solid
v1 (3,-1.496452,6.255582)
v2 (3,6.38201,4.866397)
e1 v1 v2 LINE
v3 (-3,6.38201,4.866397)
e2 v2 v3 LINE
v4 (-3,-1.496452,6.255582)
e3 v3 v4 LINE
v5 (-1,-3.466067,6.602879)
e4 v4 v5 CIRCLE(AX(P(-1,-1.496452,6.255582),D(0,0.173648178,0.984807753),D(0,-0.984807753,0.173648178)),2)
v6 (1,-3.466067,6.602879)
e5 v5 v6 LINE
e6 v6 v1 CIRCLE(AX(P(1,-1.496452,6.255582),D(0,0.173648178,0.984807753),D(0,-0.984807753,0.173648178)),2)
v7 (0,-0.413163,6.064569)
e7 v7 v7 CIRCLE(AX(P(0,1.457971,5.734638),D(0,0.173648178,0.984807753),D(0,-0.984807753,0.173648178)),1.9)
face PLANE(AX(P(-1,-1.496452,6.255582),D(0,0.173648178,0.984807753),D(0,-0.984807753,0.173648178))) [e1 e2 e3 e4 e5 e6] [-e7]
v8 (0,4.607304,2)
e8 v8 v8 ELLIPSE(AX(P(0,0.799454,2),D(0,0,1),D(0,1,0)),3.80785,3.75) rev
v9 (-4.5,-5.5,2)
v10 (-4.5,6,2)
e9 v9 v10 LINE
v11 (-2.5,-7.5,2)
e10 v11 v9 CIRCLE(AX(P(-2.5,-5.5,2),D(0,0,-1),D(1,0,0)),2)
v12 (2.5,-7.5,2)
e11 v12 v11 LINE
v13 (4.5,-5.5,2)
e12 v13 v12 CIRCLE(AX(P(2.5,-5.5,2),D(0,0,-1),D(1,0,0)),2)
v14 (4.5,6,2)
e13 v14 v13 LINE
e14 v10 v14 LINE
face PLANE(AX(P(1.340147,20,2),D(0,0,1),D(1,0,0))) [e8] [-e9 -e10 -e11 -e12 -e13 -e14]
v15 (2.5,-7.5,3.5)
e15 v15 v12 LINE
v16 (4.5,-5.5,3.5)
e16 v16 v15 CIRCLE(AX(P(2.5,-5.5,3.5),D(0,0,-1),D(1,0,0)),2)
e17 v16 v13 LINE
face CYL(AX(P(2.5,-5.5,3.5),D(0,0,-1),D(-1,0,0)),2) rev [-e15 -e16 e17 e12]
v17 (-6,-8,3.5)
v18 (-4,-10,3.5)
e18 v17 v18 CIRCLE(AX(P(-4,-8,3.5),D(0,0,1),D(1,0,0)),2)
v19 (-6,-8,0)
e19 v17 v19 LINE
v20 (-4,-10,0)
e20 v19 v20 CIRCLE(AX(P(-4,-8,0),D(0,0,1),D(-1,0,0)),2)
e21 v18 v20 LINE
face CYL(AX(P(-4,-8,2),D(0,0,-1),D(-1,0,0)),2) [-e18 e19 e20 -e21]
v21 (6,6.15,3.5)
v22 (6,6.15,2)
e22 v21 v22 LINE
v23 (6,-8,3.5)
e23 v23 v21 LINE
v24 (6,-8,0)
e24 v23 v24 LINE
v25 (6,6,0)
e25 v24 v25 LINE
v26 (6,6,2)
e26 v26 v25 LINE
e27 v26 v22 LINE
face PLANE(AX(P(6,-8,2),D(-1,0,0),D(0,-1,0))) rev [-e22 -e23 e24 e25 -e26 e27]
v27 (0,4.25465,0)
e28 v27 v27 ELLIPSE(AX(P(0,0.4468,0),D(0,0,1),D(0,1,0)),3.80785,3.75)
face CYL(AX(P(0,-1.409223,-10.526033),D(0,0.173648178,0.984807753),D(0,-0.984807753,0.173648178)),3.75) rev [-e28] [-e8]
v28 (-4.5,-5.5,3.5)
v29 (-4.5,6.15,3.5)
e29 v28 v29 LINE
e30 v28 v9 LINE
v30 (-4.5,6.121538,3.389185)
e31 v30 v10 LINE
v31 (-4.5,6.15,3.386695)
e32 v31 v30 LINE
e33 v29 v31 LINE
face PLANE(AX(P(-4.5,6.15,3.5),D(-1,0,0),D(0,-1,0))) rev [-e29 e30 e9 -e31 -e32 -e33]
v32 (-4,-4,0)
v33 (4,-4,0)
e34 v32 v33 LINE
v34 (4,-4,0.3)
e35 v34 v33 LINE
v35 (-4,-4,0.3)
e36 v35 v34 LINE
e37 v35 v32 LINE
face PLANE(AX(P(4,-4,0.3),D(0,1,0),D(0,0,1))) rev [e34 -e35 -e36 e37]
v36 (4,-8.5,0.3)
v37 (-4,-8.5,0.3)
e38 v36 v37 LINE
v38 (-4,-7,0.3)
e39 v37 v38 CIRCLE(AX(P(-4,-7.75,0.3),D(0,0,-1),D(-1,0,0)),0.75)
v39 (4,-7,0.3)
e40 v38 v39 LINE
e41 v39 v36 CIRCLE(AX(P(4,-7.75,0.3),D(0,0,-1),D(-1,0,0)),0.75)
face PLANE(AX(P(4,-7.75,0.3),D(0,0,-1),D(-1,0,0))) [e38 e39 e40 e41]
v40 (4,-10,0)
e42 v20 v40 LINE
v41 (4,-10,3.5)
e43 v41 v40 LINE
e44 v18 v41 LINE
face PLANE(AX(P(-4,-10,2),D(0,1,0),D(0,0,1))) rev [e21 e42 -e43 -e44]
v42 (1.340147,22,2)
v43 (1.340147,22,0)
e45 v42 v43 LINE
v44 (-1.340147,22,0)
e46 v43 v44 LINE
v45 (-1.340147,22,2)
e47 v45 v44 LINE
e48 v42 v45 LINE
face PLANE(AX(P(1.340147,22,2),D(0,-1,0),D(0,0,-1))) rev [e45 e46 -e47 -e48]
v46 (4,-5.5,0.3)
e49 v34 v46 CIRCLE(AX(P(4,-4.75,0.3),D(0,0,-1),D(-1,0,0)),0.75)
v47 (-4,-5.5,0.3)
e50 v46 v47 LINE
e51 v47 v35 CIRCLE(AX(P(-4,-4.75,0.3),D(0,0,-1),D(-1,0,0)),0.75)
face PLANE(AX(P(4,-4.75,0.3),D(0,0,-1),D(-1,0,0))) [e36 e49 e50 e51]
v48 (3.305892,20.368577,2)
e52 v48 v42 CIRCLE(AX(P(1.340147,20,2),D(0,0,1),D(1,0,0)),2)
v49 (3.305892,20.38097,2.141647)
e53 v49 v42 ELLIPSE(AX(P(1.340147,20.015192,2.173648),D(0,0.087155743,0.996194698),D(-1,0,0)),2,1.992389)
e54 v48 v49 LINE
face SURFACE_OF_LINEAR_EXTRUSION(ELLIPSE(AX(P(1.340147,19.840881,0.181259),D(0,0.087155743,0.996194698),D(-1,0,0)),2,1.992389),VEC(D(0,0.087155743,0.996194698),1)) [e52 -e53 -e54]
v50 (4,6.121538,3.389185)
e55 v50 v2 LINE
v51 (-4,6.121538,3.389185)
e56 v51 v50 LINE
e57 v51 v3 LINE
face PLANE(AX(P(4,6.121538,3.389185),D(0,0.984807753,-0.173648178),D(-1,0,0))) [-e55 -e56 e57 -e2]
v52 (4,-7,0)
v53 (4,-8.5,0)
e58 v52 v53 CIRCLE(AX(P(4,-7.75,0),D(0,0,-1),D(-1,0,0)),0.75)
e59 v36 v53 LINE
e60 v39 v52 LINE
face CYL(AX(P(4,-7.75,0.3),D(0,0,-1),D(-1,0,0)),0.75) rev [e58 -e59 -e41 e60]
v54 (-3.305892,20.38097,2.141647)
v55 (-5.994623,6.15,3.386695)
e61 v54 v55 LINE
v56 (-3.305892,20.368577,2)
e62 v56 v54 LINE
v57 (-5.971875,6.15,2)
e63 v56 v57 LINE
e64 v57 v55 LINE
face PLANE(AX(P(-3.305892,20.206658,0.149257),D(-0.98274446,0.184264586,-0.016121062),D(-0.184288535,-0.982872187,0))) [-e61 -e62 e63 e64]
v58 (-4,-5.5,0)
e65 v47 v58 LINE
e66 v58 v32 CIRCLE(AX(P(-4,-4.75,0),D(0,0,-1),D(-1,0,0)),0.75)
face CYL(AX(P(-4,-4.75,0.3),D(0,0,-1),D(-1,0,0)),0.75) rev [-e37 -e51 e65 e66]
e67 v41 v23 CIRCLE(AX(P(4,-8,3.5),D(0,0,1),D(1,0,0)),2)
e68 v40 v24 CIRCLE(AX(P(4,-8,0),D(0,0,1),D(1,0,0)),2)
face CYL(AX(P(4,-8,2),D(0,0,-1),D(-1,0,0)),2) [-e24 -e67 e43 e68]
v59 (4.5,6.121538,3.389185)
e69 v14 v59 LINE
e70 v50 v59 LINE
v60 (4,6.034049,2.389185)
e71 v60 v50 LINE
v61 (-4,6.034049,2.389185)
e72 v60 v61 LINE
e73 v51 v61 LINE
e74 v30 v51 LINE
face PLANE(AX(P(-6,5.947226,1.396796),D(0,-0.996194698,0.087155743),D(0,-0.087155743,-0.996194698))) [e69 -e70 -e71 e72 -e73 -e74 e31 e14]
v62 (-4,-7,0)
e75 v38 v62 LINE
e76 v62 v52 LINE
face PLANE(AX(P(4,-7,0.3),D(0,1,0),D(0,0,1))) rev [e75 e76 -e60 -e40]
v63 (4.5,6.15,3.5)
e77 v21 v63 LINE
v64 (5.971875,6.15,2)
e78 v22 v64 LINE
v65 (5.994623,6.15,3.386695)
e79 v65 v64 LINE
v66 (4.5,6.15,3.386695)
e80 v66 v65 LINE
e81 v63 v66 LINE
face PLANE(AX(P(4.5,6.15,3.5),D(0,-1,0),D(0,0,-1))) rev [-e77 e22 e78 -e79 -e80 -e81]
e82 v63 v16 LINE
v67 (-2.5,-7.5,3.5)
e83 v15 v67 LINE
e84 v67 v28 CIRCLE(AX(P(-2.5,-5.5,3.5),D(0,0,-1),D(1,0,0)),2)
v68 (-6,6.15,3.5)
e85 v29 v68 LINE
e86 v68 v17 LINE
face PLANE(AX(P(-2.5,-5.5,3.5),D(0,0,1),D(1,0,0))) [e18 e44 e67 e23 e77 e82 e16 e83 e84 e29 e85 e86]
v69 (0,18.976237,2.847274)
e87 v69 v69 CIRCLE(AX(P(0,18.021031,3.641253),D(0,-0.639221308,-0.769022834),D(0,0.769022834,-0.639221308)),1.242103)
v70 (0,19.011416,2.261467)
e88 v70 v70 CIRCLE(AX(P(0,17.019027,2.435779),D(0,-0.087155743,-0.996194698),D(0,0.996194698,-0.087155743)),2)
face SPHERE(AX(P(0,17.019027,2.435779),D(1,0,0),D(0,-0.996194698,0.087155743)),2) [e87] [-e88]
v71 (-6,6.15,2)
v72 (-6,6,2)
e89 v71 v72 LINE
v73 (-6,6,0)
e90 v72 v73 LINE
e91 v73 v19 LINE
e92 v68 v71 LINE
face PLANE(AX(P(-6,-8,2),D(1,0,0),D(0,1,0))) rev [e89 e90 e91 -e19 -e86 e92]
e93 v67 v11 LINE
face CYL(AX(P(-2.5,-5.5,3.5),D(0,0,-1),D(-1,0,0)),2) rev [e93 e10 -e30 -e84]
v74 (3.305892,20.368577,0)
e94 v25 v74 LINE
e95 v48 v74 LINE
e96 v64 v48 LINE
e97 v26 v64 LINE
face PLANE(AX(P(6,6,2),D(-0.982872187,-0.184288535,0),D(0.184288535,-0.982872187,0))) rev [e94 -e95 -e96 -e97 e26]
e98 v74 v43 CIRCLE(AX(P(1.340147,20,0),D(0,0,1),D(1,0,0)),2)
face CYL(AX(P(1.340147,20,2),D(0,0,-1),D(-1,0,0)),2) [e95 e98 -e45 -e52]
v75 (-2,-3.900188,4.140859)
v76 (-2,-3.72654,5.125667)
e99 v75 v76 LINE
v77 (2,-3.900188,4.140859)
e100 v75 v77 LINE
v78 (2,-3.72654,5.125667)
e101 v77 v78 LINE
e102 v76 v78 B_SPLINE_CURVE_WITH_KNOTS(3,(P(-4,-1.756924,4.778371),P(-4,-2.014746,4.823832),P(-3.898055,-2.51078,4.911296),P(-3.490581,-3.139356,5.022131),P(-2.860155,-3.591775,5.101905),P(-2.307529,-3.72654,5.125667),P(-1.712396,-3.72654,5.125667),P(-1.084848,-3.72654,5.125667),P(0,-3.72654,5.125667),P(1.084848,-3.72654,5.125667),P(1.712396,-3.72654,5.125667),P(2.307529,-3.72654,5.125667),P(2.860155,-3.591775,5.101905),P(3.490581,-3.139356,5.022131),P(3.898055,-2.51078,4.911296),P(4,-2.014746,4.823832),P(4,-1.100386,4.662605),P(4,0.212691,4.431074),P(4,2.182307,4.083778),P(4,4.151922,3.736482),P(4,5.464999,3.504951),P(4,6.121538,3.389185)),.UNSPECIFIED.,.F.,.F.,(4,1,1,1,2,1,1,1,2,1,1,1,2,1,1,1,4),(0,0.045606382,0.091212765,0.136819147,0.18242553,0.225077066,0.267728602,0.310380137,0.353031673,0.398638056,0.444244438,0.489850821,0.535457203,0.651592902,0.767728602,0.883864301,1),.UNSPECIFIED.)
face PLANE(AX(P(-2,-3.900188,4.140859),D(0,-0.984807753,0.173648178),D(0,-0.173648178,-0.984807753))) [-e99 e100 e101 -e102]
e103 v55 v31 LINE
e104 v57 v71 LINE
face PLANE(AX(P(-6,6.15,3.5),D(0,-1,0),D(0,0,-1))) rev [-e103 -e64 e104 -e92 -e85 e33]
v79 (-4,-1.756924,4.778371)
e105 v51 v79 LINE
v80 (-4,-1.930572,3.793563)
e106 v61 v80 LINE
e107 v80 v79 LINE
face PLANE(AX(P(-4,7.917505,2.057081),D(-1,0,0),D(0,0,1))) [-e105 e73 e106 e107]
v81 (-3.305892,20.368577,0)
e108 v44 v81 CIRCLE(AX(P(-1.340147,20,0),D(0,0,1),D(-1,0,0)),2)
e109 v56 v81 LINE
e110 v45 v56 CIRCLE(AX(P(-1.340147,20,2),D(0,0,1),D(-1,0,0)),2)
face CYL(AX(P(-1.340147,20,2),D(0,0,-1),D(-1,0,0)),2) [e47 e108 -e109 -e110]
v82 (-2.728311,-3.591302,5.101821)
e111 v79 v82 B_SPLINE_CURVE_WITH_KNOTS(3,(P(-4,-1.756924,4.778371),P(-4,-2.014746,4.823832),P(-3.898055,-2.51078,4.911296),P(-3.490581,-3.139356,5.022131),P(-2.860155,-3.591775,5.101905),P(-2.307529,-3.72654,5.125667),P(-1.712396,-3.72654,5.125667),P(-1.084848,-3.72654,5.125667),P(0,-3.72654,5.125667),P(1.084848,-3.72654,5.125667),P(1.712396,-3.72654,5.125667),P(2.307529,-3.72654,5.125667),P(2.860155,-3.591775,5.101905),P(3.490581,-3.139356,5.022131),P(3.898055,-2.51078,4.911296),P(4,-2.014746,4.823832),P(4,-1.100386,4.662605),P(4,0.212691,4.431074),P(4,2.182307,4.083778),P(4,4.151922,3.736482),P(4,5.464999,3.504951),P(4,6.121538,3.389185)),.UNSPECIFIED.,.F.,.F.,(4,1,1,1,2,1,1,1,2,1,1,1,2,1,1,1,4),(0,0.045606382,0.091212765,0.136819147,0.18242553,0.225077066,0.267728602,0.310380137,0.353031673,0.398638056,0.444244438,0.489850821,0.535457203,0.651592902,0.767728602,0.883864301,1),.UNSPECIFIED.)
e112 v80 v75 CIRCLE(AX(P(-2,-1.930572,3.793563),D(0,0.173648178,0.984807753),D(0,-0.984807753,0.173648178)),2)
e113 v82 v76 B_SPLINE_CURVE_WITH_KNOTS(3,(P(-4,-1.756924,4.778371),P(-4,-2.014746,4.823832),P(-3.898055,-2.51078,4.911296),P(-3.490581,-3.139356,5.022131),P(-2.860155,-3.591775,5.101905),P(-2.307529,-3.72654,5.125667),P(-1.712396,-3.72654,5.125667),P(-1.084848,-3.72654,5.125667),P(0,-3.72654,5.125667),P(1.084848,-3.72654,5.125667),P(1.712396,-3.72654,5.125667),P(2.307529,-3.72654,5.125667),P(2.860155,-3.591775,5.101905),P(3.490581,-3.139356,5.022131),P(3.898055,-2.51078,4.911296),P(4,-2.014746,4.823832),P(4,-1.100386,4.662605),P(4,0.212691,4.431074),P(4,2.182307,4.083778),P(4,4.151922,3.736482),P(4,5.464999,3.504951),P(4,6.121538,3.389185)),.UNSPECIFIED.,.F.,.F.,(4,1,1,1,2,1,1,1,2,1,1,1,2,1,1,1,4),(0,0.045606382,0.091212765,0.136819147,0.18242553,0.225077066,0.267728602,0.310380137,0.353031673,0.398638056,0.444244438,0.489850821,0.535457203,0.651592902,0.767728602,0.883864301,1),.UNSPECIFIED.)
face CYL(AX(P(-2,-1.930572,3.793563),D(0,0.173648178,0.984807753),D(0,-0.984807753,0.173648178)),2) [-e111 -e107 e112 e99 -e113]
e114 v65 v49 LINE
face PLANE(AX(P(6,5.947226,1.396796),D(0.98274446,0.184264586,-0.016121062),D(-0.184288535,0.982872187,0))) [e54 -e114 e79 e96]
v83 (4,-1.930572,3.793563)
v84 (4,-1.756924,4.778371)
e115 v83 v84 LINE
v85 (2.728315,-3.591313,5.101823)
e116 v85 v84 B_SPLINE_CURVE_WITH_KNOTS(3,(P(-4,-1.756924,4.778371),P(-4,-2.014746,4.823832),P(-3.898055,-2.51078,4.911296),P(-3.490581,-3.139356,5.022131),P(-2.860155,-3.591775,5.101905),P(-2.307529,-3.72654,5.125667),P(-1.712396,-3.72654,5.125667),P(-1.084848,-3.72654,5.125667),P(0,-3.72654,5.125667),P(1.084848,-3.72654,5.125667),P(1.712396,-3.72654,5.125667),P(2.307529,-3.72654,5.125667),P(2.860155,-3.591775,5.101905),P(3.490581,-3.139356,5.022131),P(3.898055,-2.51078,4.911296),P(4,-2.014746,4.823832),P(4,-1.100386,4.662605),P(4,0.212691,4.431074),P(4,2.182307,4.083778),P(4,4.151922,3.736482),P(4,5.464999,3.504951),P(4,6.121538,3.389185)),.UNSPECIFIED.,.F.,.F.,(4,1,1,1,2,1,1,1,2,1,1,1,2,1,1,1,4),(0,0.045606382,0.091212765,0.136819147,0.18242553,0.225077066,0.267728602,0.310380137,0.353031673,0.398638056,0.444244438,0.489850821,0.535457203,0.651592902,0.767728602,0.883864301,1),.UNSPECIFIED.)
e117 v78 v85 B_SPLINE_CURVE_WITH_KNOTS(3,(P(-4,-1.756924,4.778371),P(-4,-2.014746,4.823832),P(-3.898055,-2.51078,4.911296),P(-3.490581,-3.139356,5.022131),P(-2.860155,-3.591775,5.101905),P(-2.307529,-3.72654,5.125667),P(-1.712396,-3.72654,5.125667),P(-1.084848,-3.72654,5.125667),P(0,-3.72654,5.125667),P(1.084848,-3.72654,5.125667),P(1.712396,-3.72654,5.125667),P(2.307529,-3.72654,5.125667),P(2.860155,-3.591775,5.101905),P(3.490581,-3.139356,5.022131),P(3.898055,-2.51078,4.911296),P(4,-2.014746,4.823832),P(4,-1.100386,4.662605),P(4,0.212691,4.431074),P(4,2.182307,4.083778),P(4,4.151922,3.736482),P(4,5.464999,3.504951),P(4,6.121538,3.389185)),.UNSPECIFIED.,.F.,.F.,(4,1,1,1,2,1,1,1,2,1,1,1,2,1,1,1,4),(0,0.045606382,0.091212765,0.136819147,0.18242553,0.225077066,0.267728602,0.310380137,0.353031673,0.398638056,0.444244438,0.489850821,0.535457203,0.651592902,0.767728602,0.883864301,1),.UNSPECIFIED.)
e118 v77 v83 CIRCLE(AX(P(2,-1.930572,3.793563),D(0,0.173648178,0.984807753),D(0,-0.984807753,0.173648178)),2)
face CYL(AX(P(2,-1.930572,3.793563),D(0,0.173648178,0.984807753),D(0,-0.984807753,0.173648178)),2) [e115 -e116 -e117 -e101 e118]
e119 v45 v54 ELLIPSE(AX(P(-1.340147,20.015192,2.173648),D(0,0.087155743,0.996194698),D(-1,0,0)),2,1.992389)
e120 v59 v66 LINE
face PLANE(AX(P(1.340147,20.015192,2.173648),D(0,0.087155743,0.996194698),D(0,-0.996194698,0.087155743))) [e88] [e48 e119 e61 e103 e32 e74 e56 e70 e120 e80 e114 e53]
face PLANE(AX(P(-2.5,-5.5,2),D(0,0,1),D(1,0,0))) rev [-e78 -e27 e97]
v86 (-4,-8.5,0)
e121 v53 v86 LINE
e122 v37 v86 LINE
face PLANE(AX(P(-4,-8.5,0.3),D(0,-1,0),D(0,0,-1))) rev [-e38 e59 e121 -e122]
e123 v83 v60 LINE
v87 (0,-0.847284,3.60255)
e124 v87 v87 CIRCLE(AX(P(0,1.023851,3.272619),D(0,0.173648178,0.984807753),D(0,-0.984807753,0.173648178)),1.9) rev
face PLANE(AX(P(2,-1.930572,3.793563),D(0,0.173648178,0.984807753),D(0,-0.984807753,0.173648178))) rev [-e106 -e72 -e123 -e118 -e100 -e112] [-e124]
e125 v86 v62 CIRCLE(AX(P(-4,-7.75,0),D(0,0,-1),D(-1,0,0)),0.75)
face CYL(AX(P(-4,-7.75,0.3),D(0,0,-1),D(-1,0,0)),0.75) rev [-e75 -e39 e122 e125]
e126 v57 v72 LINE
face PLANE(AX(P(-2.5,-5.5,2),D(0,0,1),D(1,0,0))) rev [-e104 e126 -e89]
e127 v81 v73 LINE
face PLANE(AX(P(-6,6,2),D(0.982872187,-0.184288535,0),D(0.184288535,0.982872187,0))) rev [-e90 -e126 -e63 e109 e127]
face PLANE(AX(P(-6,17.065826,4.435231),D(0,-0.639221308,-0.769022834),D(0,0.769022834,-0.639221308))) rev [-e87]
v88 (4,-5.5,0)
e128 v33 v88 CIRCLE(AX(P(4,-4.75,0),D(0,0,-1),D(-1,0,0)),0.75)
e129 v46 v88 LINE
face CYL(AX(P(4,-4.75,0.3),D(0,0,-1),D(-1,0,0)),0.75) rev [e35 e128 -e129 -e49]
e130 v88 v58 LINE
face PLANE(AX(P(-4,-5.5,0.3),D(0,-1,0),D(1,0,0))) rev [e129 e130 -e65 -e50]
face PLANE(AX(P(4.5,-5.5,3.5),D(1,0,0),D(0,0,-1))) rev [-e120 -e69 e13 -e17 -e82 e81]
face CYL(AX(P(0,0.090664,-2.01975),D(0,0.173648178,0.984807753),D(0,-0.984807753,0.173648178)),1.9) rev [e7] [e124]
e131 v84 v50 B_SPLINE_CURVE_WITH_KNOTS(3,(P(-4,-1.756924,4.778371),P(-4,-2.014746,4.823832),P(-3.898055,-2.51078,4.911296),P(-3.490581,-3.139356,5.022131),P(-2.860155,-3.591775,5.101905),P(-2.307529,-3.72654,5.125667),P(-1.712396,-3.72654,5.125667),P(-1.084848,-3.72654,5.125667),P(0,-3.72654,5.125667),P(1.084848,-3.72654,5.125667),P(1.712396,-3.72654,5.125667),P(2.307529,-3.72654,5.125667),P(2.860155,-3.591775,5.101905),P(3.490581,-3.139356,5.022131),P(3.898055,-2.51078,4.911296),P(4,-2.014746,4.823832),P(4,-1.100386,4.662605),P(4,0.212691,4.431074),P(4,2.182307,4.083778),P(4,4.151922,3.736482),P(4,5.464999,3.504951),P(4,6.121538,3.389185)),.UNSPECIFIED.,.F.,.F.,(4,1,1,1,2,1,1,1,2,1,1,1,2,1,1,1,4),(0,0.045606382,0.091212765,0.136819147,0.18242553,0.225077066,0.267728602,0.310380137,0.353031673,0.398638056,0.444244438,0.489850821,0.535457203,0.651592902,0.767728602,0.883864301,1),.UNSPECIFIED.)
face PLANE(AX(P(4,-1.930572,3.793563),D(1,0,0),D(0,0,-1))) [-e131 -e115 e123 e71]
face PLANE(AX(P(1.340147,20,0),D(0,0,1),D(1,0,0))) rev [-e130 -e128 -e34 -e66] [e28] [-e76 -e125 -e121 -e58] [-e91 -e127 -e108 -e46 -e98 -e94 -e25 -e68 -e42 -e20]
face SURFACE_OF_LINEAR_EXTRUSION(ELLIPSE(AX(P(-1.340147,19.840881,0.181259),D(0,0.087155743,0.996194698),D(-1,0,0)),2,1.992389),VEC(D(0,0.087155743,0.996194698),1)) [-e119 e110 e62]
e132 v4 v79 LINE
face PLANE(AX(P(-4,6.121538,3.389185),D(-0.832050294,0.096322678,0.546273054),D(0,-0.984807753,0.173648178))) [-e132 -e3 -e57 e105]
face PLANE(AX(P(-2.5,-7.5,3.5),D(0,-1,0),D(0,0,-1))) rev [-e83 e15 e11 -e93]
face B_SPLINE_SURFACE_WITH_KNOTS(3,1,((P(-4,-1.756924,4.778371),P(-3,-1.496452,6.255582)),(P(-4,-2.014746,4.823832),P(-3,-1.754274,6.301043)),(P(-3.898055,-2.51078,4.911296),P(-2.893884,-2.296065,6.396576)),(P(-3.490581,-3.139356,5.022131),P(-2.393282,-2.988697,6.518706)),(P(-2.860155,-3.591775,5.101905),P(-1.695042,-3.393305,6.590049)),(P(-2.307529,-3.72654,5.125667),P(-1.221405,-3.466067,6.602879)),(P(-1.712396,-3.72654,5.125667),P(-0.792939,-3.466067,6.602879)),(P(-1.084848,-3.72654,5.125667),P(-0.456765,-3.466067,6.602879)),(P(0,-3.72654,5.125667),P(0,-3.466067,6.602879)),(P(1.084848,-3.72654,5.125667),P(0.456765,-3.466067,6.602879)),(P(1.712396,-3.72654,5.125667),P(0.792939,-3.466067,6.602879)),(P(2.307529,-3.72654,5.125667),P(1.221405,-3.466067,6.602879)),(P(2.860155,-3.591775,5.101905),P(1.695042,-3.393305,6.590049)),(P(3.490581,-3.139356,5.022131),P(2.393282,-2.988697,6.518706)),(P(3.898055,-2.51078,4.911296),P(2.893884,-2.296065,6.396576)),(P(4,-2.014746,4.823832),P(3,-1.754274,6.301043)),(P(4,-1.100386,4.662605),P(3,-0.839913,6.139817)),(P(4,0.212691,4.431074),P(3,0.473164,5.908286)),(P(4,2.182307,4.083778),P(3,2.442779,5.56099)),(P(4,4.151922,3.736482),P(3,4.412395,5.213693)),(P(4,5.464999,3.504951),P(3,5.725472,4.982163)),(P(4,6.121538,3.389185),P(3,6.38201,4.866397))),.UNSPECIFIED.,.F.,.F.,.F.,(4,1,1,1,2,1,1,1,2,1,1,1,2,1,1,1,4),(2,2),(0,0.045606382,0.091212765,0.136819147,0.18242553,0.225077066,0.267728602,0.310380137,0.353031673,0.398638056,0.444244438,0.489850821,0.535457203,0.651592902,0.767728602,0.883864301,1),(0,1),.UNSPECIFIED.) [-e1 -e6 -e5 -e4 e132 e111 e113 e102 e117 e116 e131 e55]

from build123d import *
from build123d.topology import SkipClean

# Parameters (mm, degrees)
BOSS_EXTRUDE1_DEPTH     = 2
FINGERGRIP_DEPTH        = 0.3
BOSS_EXTRUDE2_DEPTH     = 2
REVOLVE1_ANGLE          = 180
CUT_EXTRUDE3_DEPTH      = 24.23093064
CUT_EXTRUDE3_DEPTH_BACK = 24.23093064
BOSS_EXTRUDE6_DEPTH     = 1
SKETCH24_R              = 1.9
SCREW_THREADS_DEPTH     = 2.5
SCREW_HEAD_REACH        = 24.485
SKETCH25_R              = 3.75
BOSS_EXTRUDE9_DEPTH     = 1.5


with BuildPart() as part:
    # Sketch1 → Boss-Extrude1 (new body)
    with BuildSketch(Plane.XY):
        with BuildLine():
            Line((-4, -10), (4, -10))
            ThreePointArc((4, -10), (5.414213562, -9.414213562), (6, -8))
            Line((6, -8), (6, 6))
            Line((6, 6), (3.305891799, 20.36857707))
            ThreePointArc((3.305891799, 20.36857707), (2.6174191, 21.539018216), (1.340147425, 22))
            Line((1.340147425, 22), (-1.340147425, 22))
            ThreePointArc((-1.340147425, 22), (-2.6174191, 21.539018216), (-3.305891799, 20.36857707))
            Line((-3.305891799, 20.36857707), (-6, 6))
            Line((-6, 6), (-6, -8))
            ThreePointArc((-6, -8), (-5.414213562, -9.414213562), (-4, -10))
        make_face()
    extrude(amount=BOSS_EXTRUDE1_DEPTH)

    # Sketch8 → FingerGrip (cut)
    with BuildSketch(Plane(origin=(0, 0, 0), x_dir=(-1, 0, 0), z_dir=(0, 0, -1))):
        with BuildLine():
            Line((-4, -4), (4, -4))
            ThreePointArc((4, -4), (4.75, -4.75), (4, -5.5))
            Line((4, -5.5), (-4, -5.5))
            ThreePointArc((-4, -5.5), (-4.75, -4.75), (-4, -4))
        make_face()
        with BuildLine():
            Line((-4, -7), (4, -7))
            ThreePointArc((4, -7), (4.75, -7.75), (4, -8.5))
            Line((4, -8.5), (-4, -8.5))
            ThreePointArc((-4, -8.5), (-4.75, -7.75), (-4, -7))
        make_face()
    extrude(amount=-FINGERGRIP_DEPTH, mode=Mode.SUBTRACT)

    # Sketch2 → Boss-Extrude2 (add)
    with BuildSketch(Plane(origin=(0, 0.340762895, 3.894937707), x_dir=(-1, 0, 0), z_dir=(0, 0.08715574274765835, 0.9961946980917455))):
        with BuildLine():
            Line((6, -5.802856703), (-6, -5.802856703))
            Line((-6, -5.802856703), (-3.305891799, -20.116756999))
            add(Edge.make_bspline(
                [(-3.305891799, -20.116756999), (-3, -21.741971873), (-1.340147425, -21.741971873)],
                knots=[3.326940604, 3.326940604, 3.326940604, 4.71238898, 4.71238898, 4.71238898], degree=2, weights=[1, 0.769509108, 1]))
            Line((-1.340147425, -21.741971873), (1.340147425, -21.741971873))
            add(Edge.make_bspline(
                [(1.340147425, -21.741971873), (3, -21.741971873), (3.305891799, -20.116756999)],
                knots=[4.71238898, 4.71238898, 4.71238898, 6.097837357, 6.097837357, 6.097837357], degree=2, weights=[1, 0.769509108, 1]))
            Line((3.305891799, -20.116756999), (6, -5.802856703))
        make_face()
    extrude(amount=-BOSS_EXTRUDE2_DEPTH)

    # Sketch9 → Revolve1 (revolve)
    with BuildSketch(Plane(origin=(0, 0.340762895, 3.894937707), x_dir=(1, 0, 0), z_dir=(0, 0.08715574274765836, 0.9961946980917457))):
        with BuildLine():
            Line((-2, 16.741971873), (2, 16.741971873))
            ThreePointArc((2, 16.741971873), (0, 14.741971873), (-2, 16.741971873))
        make_face()
    revolve(axis=Axis((0, 17.01902651, 2.435778714), (-1, 0, 0)), revolution_arc=REVOLVE1_ANGLE)

    # Sketch11 → Cut-Extrude3 (cut, two sides: drawn at the far end of the back side and taken through both)
    with SkipClean():  # the faces are left unmerged after this step: merging them gives an invalid solid
        with BuildSketch(Plane(origin=(0, 0, 0), x_dir=(0, 0, -1), z_dir=(1, 0, 0)).offset(-CUT_EXTRUDE3_DEPTH_BACK)):
            Polygon((-4.435231088, 17.065826116), (-2.847274196, 18.976236633), (-5.75514434, 18.976236633), align=None)
        extrude(amount=CUT_EXTRUDE3_DEPTH + CUT_EXTRUDE3_DEPTH_BACK, mode=Mode.SUBTRACT)

    # Sketch17 → Boss-Extrude6 (add)
    with SkipClean():  # the faces are left unmerged after this step: merging them gives an invalid solid
        with BuildSketch(Plane(origin=(0, 0.764171798, 4.333833624), x_dir=(1, 0, 0), z_dir=(0, 0.1736481776669307, 0.984807753012208))):
            with BuildLine():
                Line((-4, 7.440012187), (-4, -2.559987813))
                ThreePointArc((-4, -2.559987813), (-3.414213562, -3.974201376), (-2, -4.559987813))
                Line((-2, -4.559987813), (2, -4.559987813))
                ThreePointArc((2, -4.559987813), (3.414213562, -3.974201376), (4, -2.559987813))
                Line((4, -2.559987813), (4, 7.440012187))
                Line((4, 7.440012187), (-4, 7.440012187))
            make_face()
        extrude(amount=-BOSS_EXTRUDE6_DEPTH)

    # ChannelLoft: read off the stored shape, not the designer's step
    # ChannelLoft: loft between two sections, ruled curve by curve
    with SkipClean():  # the faces are left unmerged after this step: merging them gives an invalid solid
        channelloft_from = [
            Edge.make_bspline([(-4, -1.756924048, 4.778370843), (-4, -2.014746113, 4.823831829), (-3.898054886, -2.510779884, 4.911295966), (-3.490581388, -3.139356468, 5.022130977), (-2.860154576, -3.59177544, 5.101904649), (-2.307528784, -3.726539554, 5.125667198), (-1.712396065, -3.726539554, 5.125667198), (-1.084847785, -3.726539554, 5.125667198), (0, -3.726539554, 5.125667198), (1.084847785, -3.726539554, 5.125667198), (1.712396065, -3.726539554, 5.125667198), (2.307528784, -3.726539554, 5.125667198), (2.860154576, -3.59177544, 5.101904649), (3.490581388, -3.139356468, 5.022130977), (3.898054886, -2.510779884, 4.911295966), (4, -2.014746113, 4.823831829), (4, -1.100385546, 4.662605391), (4, 0.212691458, 4.431074487), (4, 2.182306964, 4.083778132), (4, 4.15192247, 3.736481777), (4, 5.464999474, 3.504950873), (4, 6.121537976, 3.389185421)], [0, 0, 0, 0, 0.045606382, 0.091212765, 0.136819147, 0.18242553, 0.18242553, 0.225077066, 0.267728602, 0.310380137, 0.353031673, 0.353031673, 0.398638056, 0.444244438, 0.489850821, 0.535457203, 0.535457203, 0.651592902, 0.767728602, 0.883864301, 1, 1, 1, 1], 3),
            Edge.make_line((-4, 6.121537976, 3.389185421), (4, 6.121537976, 3.389185421)),
            Edge.make_line((-4, 6.121537976, 3.389185421), (-4, -1.756924048, 4.778370843)),
        ]
        channelloft_to = [
            Edge.make_bspline([(-3, -1.496451782, 6.255582472), (-3, -1.754273847, 6.301043458), (-2.893884014, -2.296064841, 6.396575829), (-2.393282198, -2.988696668, 6.518705507), (-1.695041902, -3.393304949, 6.590048864), (-1.221405478, -3.466067288, 6.602878828), (-0.792939425, -3.466067288, 6.602878828), (-0.45676532, -3.466067288, 6.602878828), (0, -3.466067288, 6.602878828), (0.45676532, -3.466067288, 6.602878828), (0.792939425, -3.466067288, 6.602878828), (1.221405478, -3.466067288, 6.602878828), (1.695041902, -3.393304949, 6.590048864), (2.393282198, -2.988696668, 6.518705507), (2.893884014, -2.296064841, 6.396575829), (3, -1.754273847, 6.301043458), (3, -0.83991328, 6.13981702), (3, 0.473163724, 5.908286117), (3, 2.44277923, 5.560989762), (3, 4.412394736, 5.213693406), (3, 5.72547174, 4.982162503), (3, 6.382010242, 4.866397051)], [0, 0, 0, 0, 0.045606382, 0.091212765, 0.136819147, 0.18242553, 0.18242553, 0.225077066, 0.267728602, 0.310380137, 0.353031673, 0.353031673, 0.398638056, 0.444244438, 0.489850821, 0.535457203, 0.535457203, 0.651592902, 0.767728602, 0.883864301, 1, 1, 1, 1], 3),
            Edge.make_line((-3, 6.382010242, 4.866397051), (3, 6.382010242, 4.866397051)),
            Edge.make_line((-3, 6.382010242, 4.866397051), (-3, -1.496451782, 6.255582472)),
        ]
        channelloft = Solid(Shell([*[Face.make_surface_from_curves(channelloft_from[k], channelloft_to[k]) for k in range(3)], Face(Wire(channelloft_from)), Face(Wire(channelloft_to))]))
        add(channelloft)

    # Sketch24 → Screw Threads (cut)
    with SkipClean():  # the faces are left unmerged after this step: merging them gives an invalid solid
        with BuildSketch(Plane(origin=(0, 1.024644064, 5.811045254), x_dir=(1, 0, 0), z_dir=(0, 0.17364817766693072, 0.9848077530122081))):
            with Locations(Location((0, 0.440012187, 0), (0, 0, 270))):
                Circle(SKETCH24_R)
        extrude(amount=-SCREW_THREADS_DEPTH, mode=Mode.SUBTRACT)

    # Screw Head: up to this plane
    with SkipClean():  # the faces are left unmerged after this step: merging them gives an invalid solid
        screw_head_end = Plane(origin=(1.340147425, 20, 0), z_dir=(0, 0, 1))
        # Sketch25 → Screw Head (cut, up to the surface)
        with BuildSketch(Plane(origin=(0, 0.59052362, 3.349025871), x_dir=(-1, 0, 0), z_dir=(0, -0.1736481776669307, -0.9848077530122081)), mode=Mode.PRIVATE) as screw_head_sk1:
            with Locations(Location((0, 0.440012187, 0), (0, 0, 90))):
                Circle(SKETCH25_R)
        screw_head_tool1 = split(extrude(screw_head_sk1.sketch, amount=SCREW_HEAD_REACH, mode=Mode.PRIVATE), bisect_by=screw_head_end, keep=Keep.BOTH, mode=Mode.PRIVATE)
        add(screw_head_tool1.solids().sort_by_distance((0, 1.023851, 3.272619))[0], mode=Mode.SUBTRACT)

    # Sketch28 → Boss-Extrude9 (add)
    with SkipClean():  # the faces are left unmerged after this step: merging them gives an invalid solid
        with BuildSketch(Plane.XY.offset(2)):
            with BuildLine():
                Line((-6, 6.15), (-6, -8))
                ThreePointArc((-6, -8), (-5.414213562, -9.414213562), (-4, -10))
                Line((-4, -10), (4, -10))
                ThreePointArc((4, -10), (5.414213562, -9.414213562), (6, -8))
                Line((6, -8), (6, 6.15))
                Line((6, 6.15), (4.5, 6.15))
                Line((4.5, 6.15), (4.5, -5.5))
                ThreePointArc((4.5, -5.5), (3.914213562, -6.914213562), (2.5, -7.5))
                Line((2.5, -7.5), (-2.5, -7.5))
                ThreePointArc((-2.5, -7.5), (-3.914213562, -6.914213562), (-4.5, -5.5))
                Line((-4.5, -5.5), (-4.5, 6.15))
                Line((-4.5, 6.15), (-6, 6.15))
            make_face()
        extrude(amount=BOSS_EXTRUDE9_DEPTH)


solid = part.part
